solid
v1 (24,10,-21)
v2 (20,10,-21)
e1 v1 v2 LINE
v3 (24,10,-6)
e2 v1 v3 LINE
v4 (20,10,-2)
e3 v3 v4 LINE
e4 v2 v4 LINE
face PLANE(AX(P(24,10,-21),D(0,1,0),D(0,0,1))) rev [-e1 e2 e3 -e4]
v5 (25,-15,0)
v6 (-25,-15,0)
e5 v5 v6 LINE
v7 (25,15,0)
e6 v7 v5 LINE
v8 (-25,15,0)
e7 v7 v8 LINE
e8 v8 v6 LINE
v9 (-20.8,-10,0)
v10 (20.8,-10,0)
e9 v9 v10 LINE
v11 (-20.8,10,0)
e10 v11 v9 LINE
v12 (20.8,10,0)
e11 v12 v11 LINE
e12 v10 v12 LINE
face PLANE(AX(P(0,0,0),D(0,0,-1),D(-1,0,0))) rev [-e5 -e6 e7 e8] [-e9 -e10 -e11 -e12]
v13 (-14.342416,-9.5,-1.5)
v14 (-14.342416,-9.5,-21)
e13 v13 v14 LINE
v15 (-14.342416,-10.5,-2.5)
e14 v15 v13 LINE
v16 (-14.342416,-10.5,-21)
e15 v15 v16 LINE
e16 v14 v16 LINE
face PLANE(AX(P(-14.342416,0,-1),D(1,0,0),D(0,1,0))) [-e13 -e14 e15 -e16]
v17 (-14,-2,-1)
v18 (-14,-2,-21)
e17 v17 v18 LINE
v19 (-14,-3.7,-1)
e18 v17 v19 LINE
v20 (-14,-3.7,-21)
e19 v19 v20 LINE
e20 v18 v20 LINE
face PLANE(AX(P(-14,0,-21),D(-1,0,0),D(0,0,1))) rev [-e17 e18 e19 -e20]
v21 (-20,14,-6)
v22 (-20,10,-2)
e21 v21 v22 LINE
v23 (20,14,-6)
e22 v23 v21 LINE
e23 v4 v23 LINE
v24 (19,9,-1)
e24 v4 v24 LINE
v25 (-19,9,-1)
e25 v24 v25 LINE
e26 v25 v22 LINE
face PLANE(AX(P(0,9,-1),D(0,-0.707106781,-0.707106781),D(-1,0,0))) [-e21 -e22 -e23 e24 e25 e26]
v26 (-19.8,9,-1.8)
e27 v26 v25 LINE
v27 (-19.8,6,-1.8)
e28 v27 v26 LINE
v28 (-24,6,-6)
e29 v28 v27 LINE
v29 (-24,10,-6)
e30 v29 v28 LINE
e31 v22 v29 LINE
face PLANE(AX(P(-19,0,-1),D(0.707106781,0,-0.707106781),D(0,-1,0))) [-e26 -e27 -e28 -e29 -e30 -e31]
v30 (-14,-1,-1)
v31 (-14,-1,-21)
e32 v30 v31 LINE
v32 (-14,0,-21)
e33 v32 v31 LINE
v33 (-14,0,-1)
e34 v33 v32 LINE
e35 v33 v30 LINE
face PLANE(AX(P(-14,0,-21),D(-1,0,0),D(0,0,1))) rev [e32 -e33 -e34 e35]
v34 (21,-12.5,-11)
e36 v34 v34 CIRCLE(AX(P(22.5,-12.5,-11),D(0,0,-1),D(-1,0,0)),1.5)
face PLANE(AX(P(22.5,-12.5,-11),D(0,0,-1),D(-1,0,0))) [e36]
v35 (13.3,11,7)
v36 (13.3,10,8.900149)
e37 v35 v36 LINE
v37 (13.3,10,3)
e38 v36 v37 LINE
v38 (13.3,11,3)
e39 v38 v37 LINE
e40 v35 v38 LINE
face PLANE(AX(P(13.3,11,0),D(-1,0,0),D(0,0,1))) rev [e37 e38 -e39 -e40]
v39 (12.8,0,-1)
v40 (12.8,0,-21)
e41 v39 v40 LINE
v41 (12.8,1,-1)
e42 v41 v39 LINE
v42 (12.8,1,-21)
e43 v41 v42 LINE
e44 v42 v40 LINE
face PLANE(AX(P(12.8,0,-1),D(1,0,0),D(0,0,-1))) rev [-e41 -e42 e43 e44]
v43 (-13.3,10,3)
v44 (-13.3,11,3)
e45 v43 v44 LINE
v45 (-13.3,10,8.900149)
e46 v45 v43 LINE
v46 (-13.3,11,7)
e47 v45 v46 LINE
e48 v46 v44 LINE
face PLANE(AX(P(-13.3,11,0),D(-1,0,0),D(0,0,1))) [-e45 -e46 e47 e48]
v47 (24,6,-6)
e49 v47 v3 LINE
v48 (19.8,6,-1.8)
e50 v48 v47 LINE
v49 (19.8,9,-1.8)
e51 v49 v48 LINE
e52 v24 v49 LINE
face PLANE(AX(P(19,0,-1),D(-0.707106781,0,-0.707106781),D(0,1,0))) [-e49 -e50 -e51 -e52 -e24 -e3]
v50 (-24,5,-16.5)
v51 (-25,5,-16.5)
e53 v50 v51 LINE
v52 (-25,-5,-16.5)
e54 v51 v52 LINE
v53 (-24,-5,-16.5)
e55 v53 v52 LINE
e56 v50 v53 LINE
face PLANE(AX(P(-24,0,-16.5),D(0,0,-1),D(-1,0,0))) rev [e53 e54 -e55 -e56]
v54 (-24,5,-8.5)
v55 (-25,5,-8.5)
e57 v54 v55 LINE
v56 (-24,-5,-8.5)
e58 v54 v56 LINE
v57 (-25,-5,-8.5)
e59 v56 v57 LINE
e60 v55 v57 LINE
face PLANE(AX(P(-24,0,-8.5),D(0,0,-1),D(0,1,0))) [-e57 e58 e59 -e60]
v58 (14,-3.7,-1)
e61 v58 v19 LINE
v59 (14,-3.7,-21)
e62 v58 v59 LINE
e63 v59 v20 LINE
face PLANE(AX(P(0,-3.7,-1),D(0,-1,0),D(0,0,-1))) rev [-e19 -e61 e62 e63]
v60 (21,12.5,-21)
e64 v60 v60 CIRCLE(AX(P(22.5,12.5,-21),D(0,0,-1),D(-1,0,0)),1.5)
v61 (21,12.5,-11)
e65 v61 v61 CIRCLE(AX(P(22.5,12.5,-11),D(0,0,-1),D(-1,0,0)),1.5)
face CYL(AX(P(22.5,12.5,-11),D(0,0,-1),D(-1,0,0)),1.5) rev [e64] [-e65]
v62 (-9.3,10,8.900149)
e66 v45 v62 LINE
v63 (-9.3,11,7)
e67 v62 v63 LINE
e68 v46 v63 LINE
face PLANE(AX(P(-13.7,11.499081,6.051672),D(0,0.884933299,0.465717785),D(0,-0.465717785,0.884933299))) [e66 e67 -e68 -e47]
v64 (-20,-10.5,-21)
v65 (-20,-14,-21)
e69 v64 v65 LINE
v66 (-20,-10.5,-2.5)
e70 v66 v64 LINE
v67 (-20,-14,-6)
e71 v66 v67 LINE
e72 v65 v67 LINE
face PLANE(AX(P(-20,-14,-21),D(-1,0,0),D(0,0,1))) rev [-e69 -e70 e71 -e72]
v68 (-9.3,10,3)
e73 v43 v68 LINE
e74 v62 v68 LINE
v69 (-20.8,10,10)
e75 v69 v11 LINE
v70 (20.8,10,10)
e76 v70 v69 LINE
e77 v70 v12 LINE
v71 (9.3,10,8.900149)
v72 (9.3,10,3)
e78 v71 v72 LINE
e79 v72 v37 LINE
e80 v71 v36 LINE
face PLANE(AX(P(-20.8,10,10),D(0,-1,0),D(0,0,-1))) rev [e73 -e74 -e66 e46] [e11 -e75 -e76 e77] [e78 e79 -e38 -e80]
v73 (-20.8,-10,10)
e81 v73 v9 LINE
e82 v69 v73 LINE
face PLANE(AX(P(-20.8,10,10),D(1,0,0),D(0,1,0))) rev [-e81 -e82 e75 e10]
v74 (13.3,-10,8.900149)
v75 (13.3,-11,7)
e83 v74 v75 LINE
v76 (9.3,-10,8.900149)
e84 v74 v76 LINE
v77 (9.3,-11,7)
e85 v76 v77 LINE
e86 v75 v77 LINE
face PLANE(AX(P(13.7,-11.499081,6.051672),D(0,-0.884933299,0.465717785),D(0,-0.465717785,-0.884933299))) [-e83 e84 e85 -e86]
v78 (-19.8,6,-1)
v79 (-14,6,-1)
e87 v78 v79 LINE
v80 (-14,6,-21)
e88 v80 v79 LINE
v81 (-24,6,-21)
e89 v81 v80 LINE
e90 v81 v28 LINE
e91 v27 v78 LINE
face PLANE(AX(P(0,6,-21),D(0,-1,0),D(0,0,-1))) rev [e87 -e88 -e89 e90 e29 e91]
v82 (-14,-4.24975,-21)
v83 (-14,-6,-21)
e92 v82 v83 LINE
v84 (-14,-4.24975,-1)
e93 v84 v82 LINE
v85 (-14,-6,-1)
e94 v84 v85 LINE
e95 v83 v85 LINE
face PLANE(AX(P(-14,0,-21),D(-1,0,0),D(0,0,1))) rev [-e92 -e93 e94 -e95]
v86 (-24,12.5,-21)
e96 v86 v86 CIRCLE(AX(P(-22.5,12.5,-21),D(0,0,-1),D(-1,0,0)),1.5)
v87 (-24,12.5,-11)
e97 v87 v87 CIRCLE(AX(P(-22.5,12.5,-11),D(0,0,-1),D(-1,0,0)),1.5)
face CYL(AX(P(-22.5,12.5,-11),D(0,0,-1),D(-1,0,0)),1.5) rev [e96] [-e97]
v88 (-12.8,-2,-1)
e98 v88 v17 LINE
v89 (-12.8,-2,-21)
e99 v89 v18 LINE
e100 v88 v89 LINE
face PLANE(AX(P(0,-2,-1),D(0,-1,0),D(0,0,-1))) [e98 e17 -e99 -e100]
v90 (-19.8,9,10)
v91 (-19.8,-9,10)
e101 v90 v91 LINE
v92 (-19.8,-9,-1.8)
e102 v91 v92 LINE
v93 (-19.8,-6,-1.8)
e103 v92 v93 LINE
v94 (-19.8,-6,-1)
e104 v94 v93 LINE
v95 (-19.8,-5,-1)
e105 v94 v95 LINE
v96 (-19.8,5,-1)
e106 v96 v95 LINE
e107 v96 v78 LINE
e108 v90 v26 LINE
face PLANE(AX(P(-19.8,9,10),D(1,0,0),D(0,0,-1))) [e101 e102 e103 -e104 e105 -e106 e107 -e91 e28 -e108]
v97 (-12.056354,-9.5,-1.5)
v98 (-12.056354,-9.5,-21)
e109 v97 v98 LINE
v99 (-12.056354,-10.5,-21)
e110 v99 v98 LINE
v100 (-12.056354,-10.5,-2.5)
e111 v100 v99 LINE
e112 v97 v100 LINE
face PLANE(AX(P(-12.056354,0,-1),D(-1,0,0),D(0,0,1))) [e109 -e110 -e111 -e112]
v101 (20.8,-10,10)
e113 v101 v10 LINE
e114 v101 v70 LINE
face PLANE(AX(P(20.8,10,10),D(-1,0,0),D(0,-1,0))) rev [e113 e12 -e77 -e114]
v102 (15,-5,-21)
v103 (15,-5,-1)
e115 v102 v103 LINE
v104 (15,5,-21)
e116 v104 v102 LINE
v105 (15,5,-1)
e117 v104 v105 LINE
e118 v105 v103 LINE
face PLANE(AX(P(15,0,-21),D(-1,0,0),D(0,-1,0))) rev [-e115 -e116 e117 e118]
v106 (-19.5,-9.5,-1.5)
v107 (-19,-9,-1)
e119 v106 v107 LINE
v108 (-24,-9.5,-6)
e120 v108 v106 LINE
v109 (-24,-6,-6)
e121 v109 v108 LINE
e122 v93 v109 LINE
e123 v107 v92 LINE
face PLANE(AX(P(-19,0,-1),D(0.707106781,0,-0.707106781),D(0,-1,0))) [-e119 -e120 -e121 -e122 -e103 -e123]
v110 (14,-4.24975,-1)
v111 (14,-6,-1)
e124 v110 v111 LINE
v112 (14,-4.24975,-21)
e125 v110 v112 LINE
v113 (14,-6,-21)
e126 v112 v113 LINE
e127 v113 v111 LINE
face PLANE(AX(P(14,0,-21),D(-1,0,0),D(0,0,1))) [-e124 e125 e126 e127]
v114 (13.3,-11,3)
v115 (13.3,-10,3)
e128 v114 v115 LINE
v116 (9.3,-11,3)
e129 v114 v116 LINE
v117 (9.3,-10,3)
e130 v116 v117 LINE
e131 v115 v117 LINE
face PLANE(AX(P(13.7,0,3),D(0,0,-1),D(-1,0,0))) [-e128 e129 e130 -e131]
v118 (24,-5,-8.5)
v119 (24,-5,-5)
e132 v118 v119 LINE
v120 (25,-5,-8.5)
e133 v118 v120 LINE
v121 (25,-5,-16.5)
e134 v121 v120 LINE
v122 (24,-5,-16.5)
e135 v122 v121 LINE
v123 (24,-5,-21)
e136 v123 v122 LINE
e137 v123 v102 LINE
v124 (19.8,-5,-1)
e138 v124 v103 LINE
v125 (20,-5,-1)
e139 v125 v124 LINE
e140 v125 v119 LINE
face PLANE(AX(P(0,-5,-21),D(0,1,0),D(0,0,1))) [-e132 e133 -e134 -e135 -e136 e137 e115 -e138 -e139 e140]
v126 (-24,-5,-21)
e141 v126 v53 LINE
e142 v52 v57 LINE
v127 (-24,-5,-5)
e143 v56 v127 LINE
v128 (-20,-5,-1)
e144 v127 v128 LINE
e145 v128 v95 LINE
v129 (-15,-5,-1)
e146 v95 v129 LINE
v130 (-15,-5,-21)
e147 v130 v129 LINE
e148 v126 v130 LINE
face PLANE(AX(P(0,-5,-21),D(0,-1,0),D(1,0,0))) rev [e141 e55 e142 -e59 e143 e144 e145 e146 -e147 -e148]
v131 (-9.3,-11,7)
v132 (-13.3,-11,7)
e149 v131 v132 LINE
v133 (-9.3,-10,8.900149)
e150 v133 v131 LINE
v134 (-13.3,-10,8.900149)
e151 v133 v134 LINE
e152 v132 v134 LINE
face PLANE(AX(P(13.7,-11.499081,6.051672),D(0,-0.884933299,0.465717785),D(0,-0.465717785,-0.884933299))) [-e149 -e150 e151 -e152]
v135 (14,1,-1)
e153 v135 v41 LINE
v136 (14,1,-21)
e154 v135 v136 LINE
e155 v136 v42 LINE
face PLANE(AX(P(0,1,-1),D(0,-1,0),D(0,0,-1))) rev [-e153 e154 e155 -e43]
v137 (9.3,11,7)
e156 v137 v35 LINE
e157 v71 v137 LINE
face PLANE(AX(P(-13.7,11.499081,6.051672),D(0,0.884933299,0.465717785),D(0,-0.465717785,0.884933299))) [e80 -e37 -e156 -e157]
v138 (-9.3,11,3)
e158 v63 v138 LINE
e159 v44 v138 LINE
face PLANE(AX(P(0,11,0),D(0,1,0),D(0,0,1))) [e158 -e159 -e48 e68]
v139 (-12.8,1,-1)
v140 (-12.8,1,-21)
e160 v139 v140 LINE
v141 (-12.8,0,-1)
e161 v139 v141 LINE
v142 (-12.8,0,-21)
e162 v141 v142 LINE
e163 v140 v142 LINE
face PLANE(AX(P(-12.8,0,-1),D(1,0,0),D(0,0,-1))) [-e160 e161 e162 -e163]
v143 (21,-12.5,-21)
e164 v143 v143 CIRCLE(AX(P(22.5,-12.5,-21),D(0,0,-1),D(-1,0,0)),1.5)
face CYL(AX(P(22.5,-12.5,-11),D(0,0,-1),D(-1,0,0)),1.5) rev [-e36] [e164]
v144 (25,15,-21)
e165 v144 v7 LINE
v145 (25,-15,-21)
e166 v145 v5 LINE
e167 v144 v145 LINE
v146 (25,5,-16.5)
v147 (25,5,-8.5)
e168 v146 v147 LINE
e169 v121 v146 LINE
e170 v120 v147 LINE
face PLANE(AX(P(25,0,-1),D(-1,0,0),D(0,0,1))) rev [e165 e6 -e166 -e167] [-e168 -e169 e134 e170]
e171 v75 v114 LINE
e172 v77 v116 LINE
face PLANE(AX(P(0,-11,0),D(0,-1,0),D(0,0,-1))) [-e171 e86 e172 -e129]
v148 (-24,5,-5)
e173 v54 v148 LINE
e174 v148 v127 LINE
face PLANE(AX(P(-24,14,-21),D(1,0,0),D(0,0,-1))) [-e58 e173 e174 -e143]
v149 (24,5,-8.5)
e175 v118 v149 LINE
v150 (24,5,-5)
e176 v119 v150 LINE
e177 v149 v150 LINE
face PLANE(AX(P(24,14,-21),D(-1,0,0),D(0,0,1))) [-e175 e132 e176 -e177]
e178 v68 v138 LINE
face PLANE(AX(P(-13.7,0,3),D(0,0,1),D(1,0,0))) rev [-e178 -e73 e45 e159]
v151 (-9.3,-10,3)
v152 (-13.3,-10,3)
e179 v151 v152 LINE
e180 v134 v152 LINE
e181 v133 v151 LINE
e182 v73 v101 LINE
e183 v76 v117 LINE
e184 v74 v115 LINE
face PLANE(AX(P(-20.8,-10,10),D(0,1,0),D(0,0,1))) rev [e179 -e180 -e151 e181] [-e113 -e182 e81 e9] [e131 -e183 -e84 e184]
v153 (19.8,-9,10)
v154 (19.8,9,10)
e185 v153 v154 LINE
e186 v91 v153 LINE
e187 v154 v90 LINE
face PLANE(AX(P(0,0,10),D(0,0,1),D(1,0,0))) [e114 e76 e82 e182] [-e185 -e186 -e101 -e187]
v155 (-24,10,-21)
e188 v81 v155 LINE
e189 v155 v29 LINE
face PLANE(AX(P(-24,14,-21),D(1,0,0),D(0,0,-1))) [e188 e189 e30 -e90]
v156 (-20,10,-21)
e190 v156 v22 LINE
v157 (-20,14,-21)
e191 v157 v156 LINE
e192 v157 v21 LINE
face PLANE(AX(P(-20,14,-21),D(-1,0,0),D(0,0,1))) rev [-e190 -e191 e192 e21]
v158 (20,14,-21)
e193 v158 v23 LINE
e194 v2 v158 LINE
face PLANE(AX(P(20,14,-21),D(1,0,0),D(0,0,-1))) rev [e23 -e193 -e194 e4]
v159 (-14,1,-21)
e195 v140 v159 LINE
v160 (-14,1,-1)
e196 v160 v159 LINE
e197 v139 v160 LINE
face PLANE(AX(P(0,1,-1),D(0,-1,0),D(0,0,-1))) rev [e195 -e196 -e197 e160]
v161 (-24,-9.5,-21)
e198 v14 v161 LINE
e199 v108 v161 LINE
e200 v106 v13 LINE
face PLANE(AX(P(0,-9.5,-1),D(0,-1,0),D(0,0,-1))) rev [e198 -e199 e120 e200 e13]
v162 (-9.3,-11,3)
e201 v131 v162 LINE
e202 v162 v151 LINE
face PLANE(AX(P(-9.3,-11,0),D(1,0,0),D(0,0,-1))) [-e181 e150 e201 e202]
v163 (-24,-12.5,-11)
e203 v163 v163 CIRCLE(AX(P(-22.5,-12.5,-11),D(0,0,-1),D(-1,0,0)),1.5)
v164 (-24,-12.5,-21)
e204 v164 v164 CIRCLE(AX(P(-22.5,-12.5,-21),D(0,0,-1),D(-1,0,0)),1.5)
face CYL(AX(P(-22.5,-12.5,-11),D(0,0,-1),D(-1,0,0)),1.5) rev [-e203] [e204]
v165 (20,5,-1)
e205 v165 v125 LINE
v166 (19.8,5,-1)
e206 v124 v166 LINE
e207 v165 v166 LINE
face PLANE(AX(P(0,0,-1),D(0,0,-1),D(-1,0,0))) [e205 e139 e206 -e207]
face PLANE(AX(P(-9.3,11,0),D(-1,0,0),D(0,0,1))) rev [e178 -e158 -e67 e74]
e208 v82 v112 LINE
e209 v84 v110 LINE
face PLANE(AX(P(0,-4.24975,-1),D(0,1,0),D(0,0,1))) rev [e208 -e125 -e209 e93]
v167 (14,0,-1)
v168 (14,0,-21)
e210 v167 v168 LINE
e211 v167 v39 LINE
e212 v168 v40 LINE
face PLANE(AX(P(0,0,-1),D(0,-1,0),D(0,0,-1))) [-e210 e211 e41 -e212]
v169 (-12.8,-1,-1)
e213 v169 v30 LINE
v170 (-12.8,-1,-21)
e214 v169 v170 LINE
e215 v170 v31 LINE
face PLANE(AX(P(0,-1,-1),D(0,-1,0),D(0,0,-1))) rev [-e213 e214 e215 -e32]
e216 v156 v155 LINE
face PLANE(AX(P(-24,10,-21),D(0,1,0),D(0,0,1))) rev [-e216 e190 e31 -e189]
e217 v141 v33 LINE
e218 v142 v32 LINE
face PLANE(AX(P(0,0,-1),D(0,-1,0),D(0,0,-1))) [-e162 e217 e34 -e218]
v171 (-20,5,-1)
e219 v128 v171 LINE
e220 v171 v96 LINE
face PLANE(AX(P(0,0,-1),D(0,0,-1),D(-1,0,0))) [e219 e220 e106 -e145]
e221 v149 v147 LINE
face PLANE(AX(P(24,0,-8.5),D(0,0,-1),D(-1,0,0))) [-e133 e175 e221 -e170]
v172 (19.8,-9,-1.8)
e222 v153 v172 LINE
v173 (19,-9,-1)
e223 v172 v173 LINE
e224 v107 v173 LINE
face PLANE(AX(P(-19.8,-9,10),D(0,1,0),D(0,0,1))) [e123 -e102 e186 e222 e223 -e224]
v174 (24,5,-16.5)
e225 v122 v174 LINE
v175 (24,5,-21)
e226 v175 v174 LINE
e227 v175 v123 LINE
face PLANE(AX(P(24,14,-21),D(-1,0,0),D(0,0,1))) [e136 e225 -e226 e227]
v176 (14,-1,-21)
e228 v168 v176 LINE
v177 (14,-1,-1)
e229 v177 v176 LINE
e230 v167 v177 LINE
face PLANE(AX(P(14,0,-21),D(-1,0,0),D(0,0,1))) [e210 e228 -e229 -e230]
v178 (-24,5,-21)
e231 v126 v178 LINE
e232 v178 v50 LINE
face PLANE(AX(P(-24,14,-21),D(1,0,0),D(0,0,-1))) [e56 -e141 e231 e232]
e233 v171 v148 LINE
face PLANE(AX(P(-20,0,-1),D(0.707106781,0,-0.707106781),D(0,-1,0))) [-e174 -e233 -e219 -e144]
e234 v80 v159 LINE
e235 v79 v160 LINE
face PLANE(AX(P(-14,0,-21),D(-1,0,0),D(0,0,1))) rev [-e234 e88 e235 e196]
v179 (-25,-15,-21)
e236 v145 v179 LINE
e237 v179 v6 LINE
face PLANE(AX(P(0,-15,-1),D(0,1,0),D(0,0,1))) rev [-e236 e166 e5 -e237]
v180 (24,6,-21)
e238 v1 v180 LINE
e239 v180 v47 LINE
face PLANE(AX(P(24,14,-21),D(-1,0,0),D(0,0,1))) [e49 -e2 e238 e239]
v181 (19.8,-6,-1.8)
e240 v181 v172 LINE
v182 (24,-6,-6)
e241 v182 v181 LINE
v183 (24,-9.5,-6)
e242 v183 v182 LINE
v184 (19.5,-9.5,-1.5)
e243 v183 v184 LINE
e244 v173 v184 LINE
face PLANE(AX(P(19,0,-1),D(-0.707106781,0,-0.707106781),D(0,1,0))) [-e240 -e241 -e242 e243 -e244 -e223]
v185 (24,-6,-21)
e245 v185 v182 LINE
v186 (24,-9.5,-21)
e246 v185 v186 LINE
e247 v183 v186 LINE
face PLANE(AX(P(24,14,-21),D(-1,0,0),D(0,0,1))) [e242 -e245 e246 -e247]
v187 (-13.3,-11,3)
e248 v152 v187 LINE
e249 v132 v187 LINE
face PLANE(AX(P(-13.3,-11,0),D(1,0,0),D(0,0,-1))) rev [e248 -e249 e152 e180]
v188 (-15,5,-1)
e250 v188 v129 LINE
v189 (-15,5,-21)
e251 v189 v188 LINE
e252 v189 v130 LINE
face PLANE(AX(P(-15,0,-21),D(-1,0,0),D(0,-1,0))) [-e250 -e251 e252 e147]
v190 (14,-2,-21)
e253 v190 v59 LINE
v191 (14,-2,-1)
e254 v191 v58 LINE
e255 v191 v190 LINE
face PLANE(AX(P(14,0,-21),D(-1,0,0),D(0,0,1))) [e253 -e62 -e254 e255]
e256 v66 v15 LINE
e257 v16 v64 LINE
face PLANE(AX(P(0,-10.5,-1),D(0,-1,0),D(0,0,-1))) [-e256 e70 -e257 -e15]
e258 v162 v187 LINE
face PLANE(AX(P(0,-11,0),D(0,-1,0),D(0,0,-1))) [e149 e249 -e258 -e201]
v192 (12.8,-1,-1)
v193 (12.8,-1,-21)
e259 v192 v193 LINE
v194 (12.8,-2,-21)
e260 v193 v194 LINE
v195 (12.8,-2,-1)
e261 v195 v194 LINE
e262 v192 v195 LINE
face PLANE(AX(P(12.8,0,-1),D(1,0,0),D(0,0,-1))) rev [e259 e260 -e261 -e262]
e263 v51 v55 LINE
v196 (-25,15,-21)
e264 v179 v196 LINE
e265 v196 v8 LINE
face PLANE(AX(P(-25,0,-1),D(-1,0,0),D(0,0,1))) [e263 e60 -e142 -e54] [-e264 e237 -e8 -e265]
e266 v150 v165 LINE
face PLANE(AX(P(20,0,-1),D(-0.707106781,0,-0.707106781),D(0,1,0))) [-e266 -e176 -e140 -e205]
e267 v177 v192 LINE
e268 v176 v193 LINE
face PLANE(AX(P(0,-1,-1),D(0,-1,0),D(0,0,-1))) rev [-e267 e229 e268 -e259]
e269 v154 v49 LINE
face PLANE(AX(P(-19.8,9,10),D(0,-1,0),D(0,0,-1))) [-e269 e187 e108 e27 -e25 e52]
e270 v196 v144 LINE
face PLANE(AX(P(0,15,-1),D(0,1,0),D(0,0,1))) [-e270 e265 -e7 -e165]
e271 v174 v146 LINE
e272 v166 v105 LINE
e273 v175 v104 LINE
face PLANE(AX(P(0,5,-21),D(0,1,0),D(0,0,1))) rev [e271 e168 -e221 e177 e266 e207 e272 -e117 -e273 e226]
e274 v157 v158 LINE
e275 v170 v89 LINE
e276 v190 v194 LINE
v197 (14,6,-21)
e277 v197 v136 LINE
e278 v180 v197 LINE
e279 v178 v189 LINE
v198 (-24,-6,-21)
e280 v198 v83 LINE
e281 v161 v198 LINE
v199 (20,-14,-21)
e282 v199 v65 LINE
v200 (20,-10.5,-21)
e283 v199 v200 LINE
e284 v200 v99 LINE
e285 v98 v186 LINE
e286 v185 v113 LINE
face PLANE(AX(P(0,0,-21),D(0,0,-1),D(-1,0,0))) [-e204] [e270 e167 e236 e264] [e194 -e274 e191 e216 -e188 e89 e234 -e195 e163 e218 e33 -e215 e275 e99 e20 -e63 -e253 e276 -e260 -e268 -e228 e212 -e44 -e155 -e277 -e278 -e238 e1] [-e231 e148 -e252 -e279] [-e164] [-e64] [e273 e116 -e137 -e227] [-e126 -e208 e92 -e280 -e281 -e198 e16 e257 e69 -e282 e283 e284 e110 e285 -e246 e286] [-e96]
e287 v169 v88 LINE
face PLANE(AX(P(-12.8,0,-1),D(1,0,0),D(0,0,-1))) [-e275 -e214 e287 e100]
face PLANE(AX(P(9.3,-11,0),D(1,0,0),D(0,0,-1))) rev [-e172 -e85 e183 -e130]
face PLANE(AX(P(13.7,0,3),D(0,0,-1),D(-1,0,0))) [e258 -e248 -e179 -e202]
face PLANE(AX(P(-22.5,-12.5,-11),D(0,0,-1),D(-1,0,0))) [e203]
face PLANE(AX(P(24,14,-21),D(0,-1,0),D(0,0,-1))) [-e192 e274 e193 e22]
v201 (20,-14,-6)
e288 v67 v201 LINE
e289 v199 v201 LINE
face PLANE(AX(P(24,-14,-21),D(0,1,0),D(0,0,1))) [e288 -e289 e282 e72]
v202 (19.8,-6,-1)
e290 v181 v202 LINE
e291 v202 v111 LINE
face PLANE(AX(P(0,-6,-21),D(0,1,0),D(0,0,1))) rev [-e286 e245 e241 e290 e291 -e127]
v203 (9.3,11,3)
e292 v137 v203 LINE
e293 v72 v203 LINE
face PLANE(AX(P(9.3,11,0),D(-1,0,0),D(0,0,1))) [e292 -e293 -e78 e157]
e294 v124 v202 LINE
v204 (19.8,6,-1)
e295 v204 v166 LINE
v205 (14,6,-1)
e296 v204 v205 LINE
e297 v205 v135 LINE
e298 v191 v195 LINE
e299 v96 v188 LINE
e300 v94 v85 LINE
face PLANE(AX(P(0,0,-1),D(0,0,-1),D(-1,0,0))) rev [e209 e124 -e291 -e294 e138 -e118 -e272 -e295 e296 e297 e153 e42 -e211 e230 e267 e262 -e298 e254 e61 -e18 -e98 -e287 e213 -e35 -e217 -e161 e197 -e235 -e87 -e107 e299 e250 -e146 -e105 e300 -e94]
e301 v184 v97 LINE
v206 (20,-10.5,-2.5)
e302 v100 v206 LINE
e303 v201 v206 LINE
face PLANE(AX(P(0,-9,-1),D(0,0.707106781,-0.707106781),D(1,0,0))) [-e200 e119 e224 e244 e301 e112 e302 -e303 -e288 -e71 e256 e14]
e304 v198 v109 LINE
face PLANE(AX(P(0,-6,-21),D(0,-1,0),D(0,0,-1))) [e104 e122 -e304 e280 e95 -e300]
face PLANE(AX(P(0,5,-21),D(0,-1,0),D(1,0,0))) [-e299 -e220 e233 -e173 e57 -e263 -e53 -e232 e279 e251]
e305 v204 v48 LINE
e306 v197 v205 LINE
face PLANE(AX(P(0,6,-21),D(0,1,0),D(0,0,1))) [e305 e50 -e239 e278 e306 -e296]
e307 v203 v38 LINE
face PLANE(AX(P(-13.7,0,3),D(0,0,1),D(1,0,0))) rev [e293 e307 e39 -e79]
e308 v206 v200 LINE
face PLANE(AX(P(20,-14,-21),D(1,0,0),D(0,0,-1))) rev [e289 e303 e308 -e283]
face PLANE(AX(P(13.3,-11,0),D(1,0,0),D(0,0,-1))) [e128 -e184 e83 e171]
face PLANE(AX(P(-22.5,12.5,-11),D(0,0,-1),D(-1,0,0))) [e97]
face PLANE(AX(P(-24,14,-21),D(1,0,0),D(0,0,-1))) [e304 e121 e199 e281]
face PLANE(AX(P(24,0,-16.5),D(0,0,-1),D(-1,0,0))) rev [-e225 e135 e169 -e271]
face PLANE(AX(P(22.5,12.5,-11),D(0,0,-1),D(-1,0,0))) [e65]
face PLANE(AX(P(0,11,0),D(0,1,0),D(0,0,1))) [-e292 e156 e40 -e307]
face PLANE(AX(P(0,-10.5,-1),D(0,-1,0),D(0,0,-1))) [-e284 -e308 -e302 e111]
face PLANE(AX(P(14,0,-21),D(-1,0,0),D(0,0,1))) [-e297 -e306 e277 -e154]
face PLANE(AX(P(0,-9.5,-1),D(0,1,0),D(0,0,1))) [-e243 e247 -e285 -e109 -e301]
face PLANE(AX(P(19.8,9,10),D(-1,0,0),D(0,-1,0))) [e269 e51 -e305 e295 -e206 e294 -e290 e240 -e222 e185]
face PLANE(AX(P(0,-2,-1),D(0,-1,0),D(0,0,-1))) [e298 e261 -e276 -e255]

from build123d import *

# Parameters (mm, degrees)
SKETCH1_W            = 41.6
SKETCH1_H            = 20
SKETCH1_W_2          = 39.6
SKETCH1_H_2          = 18
BOSS_EXTRUDE2_DEPTH  = 10
SKETCH2_W            = 4
SKETCH2_H            = 10
BOSS_EXTRUDE3_DEPTH  = 1
SKETCH3_W            = 3
SKETCH3_H            = 1
CUT_EXTRUDE1_DEPTH   = 27
SKETCH4_W            = 4
SKETCH4_H            = 10
BOSS_EXTRUDE4_DEPTH  = 1
SKETCH5_W            = 3
SKETCH5_H            = 1
CUT_EXTRUDE2_DEPTH   = 27
SKETCH6_W            = 50
SKETCH6_H            = 30
SKETCH6_W_2          = 41.6
SKETCH6_H_2          = 20
SKETCH6_W_3          = 39.6
SKETCH6_H_3          = 18
BOSS_EXTRUDE6_DEPTH  = 1
SKETCH7_W            = 50
SKETCH7_H            = 30
SKETCH7_W_2          = 48
SKETCH7_H_2          = 28
BOSS_EXTRUDE7_DEPTH  = 20
SKETCH8_W            = 4.2
SKETCH8_H            = 1
BOSS_EXTRUDE8_DEPTH  = 20
SKETCH9_W            = 4.2
SKETCH9_H            = 1
BOSS_EXTRUDE9_DEPTH  = 20
SKETCH10_W           = 4
SKETCH10_H           = 4
BOSS_EXTRUDE10_DEPTH = 20
SKETCH11_W           = 2
SKETCH11_H           = 10
CUT_EXTRUDE3_DEPTH   = 1
SKETCH12_W           = 2
SKETCH12_H           = 10
CUT_EXTRUDE4_DEPTH   = 1
SKETCH13_R           = 1.5
CUT_EXTRUDE5_DEPTH   = 10
CHAMFER2_SIZE        = 5
CHAMFER3_SIZE        = 5
CHAMFER4_SIZE        = 4
SKETCH16_W           = 1.2
SKETCH16_H           = 1
BOSS_EXTRUDE11_DEPTH = 20
BOSS_EXTRUDE12_DEPTH = 20
SKETCH18_W           = 28
SKETCH18_H           = 0.549749779
BOSS_EXTRUDE13_DEPTH = 20


# Some blends are built 0.0001 mm under size
with BuildPart() as part:
    # Sketch1 → Boss-Extrude2 (new body)
    with BuildSketch(Plane.XY):
        Rectangle(SKETCH1_W, SKETCH1_H)
        Rectangle(SKETCH1_W_2, SKETCH1_H_2, mode=Mode.SUBTRACT)
    extrude(amount=BOSS_EXTRUDE2_DEPTH)

    # Sketch2 → Boss-Extrude3 (add)
    with BuildSketch(Plane.XZ.offset(10)):
        with Locations((-11.3, 5)):
            Rectangle(SKETCH2_W, SKETCH2_H)
        with Locations((11.3, 5)):
            Rectangle(SKETCH2_W, SKETCH2_H)
    extrude(amount=BOSS_EXTRUDE3_DEPTH)

    # Sketch3 → Cut-Extrude1 (cut)
    with BuildSketch(Plane.ZY.offset(13.3)):
        Polygon((8.900149248, -10), (7, -11), (10, -11), (10, -10), align=None)
        with Locations((1.5, -10.5)):
            Rectangle(SKETCH3_W, SKETCH3_H)
    extrude(amount=-CUT_EXTRUDE1_DEPTH, mode=Mode.SUBTRACT)

    # Sketch4 → Boss-Extrude4 (add)
    with BuildSketch(Plane(origin=(0, 10, 0), x_dir=(1, 0, 0), z_dir=(0, 1, 0))):
        with Locations((11.3, -5)):
            Rectangle(SKETCH4_W, SKETCH4_H)
        with Locations((-11.3, -5)):
            Rectangle(SKETCH4_W, SKETCH4_H)
    extrude(amount=BOSS_EXTRUDE4_DEPTH)

    # Sketch5 → Cut-Extrude2 (cut)
    with BuildSketch(Plane(origin=(13.3, 0, 0), x_dir=(0, 0, -1), z_dir=(1, 0, 0))):
        Polygon((-7, 11), (-10, 11), (-10, 10), (-8.900149248, 10), align=None)
        with Locations((-1.5, 10.5)):
            Rectangle(SKETCH5_W, SKETCH5_H)
    extrude(amount=-CUT_EXTRUDE2_DEPTH, mode=Mode.SUBTRACT)

    # Sketch6 → Boss-Extrude6 (add)
    # profile 1 of 2: a face of its own
    with BuildSketch(Plane(origin=(0, 0, 0), x_dir=(-1, 0, 0), z_dir=(0, 0, -1))):
        Rectangle(SKETCH6_W, SKETCH6_H)
        Rectangle(SKETCH6_W_2, SKETCH6_H_2, mode=Mode.SUBTRACT)
    # profile 2 of 2: a face of its own
    with BuildSketch(Plane(origin=(0, 0, 0), x_dir=(-1, 0, 0), z_dir=(0, 0, -1))):
        Rectangle(SKETCH6_W_2, SKETCH6_H_2)
        Rectangle(SKETCH6_W_3, SKETCH6_H_3, mode=Mode.SUBTRACT)
    extrude(amount=BOSS_EXTRUDE6_DEPTH)

    # Sketch7 → Boss-Extrude7 (add)
    with BuildSketch(Plane(origin=(0, 0, -1), x_dir=(-1, 0, 0), z_dir=(0, 0, -1))):
        Rectangle(SKETCH7_W, SKETCH7_H)
        Rectangle(SKETCH7_W_2, SKETCH7_H_2, mode=Mode.SUBTRACT)
    extrude(amount=BOSS_EXTRUDE7_DEPTH)

    # Sketch8 → Boss-Extrude8 (add)
    with BuildSketch(Plane(origin=(0, 0, -1), x_dir=(-1, 0, 0), z_dir=(0, 0, -1))):
        Polygon((-15, -5), (-19.8, -5), (-19.8, -6), (-14, -6), (-14, 6), (-19.8, 6), (-19.8, 5), (-15, 5), align=None)
        with Locations((-21.9, 5.5)):
            Rectangle(SKETCH8_W, SKETCH8_H)
        with Locations((-21.9, -5.5)):
            Rectangle(SKETCH8_W, SKETCH8_H)
    extrude(amount=BOSS_EXTRUDE8_DEPTH)

    # Sketch9 → Boss-Extrude9 (add)
    with BuildSketch(Plane(origin=(0, 0, -1), x_dir=(-1, 0, 0), z_dir=(0, 0, -1))):
        Polygon((15, 5), (19.8, 5), (19.8, 6), (14, 6), (14, -6), (19.8, -6), (19.8, -5), (15, -5), align=None)
        with Locations((21.9, 5.5)):
            Rectangle(SKETCH9_W, SKETCH9_H)
        with Locations((21.9, -5.5)):
            Rectangle(SKETCH9_W, SKETCH9_H)
    extrude(amount=BOSS_EXTRUDE9_DEPTH)

    # Sketch10 → Boss-Extrude10 (add)
    with BuildSketch(Plane(origin=(0, 0, -1), x_dir=(-1, 0, 0), z_dir=(0, 0, -1))):
        with Locations((-22, 12)):
            Rectangle(SKETCH10_W, SKETCH10_H)
        with Locations((22, 12)):
            Rectangle(SKETCH10_W, SKETCH10_H)
        with Locations((22, -12)):
            Rectangle(SKETCH10_W, SKETCH10_H)
        with Locations((-22, -12)):
            Rectangle(SKETCH10_W, SKETCH10_H)
    extrude(amount=BOSS_EXTRUDE10_DEPTH)

    # Sketch11 → Cut-Extrude3 (cut)
    with BuildSketch(Plane.ZY.offset(25)):
        Polygon((-10.5, -5), (-10.5, 5), (-16.5, 5), (-16.5, 0), (-16.5, -5), align=None)
        with Locations((-9.5, 0)):
            Rectangle(SKETCH11_W, SKETCH11_H)
    extrude(amount=-CUT_EXTRUDE3_DEPTH, mode=Mode.SUBTRACT)

    # Sketch12 → Cut-Extrude4 (cut)
    with BuildSketch(Plane(origin=(25, 0, 0), x_dir=(0, 0, -1), z_dir=(1, 0, 0))):
        with Locations((9.5, 0)):
            Rectangle(SKETCH12_W, SKETCH12_H)
        Polygon((16.5, 5), (10.5, 5), (10.5, -5), (16.5, -5), (16.5, 0), align=None)
    extrude(amount=-CUT_EXTRUDE4_DEPTH, mode=Mode.SUBTRACT)

    # Sketch13 → Cut-Extrude5 (cut)
    with BuildSketch(Plane(origin=(0, 0, -21), x_dir=(-1, 0, 0), z_dir=(0, 0, -1))):
        with Locations((-22.5, 12.5)):
            Circle(SKETCH13_R)
        with Locations((22.5, 12.5)):
            Circle(SKETCH13_R)
        with Locations((22.5, -12.5)):
            Circle(SKETCH13_R)
        with Locations((-22.5, -12.5)):
            Circle(SKETCH13_R)
    extrude(amount=-CUT_EXTRUDE5_DEPTH, mode=Mode.SUBTRACT)

    # Chamfer2
    chamfer2_edges = [part.edges().sort_by_distance(p)[0] for p in [
        (0, 14, -1),
        (0, -14, -1),
    ]]
    chamfer(chamfer2_edges, length=CHAMFER2_SIZE - 0.0001)  # a hair under: the kernel refuses the full size

    # Chamfer3
    # the kernel refuses this chamfer: 5 mm, written as the material it adds along each edge
    with BuildSketch(Plane(origin=(24, -21.85851494, -1), x_dir=(-0.9996219169112968, 0, 0.02749587661058636), z_dir=(0, 1, 0))) as chamfer3_piece_1_section:
        Polygon((CHAMFER3_SIZE * 0.999621916911, -CHAMFER3_SIZE * 0.0274958766106), (-CHAMFER3_SIZE * 0.0274958766106, -CHAMFER3_SIZE * 0.999621916911), (0, 0), align=None)
    chamfer3_piece_1 = extrude(amount=28.71692988, mode=Mode.PRIVATE)
    chamfer3_piece_1 = split(chamfer3_piece_1, bisect_by=Plane(origin=(19.8, -10.000025, -1.99995), z_dir=(1, 0, 0)), keep=Keep.TOP, mode=Mode.PRIVATE)
    chamfer3_piece_1 = split(chamfer3_piece_1, bisect_by=Plane(origin=(19.999975, -5, -1.99995), z_dir=(0, -1, 0)), keep=Keep.TOP, mode=Mode.PRIVATE)
    chamfer3_piece_1 = split(chamfer3_piece_1, bisect_by=Plane(origin=(19.999975, -10.0000375, -1.9999375), z_dir=(0, 0.7071067811865476, -0.7071067811865476)), keep=Keep.TOP, mode=Mode.PRIVATE)
    add(chamfer3_piece_1)
    with BuildSketch(Plane(origin=(24, -21.85851494, -1), x_dir=(-0.9996219169112968, 0, 0.02749587661058636), z_dir=(0, 1, 0))) as chamfer3_piece_2_section:
        Polygon((CHAMFER3_SIZE * 0.999621916911, -CHAMFER3_SIZE * 0.0274958766106), (-CHAMFER3_SIZE * 0.0274958766106, -CHAMFER3_SIZE * 0.999621916911), (0, 0), align=None)
    chamfer3_piece_2 = extrude(amount=28.71692988, mode=Mode.PRIVATE)
    chamfer3_piece_2 = split(chamfer3_piece_2, bisect_by=Plane(origin=(19.599975009, -9, -1.399950019), z_dir=(0, -1, 0)), keep=Keep.TOP, mode=Mode.PRIVATE)
    chamfer3_piece_2 = split(chamfer3_piece_2, bisect_by=Plane(origin=(19.599975009, -9.300037514, -1.299937514), z_dir=(0, 0.7071067811865476, -0.7071067811865476)), keep=Keep.TOP, mode=Mode.PRIVATE)
    add(chamfer3_piece_2)
    with BuildSketch(Plane(origin=(24, -21.85851494, -1), x_dir=(-0.9996219169112968, 0, 0.02749587661058636), z_dir=(0, 1, 0))) as chamfer3_piece_3_section:
        Polygon((CHAMFER3_SIZE * 0.999621916911, -CHAMFER3_SIZE * 0.0274958766106), (-CHAMFER3_SIZE * 0.0274958766106, -CHAMFER3_SIZE * 0.999621916911), (0, 0), align=None)
    chamfer3_piece_3 = extrude(amount=28.71692988, mode=Mode.PRIVATE)
    chamfer3_piece_3 = split(chamfer3_piece_3, bisect_by=Plane(origin=(19.8, 6.42920747, -1.451851852), z_dir=(1, 0, 0)), keep=Keep.TOP, mode=Mode.PRIVATE)
    chamfer3_piece_3 = split(chamfer3_piece_3, bisect_by=Plane(origin=(19.903703704, 5, -1.451851852), z_dir=(0, 1, 0)), keep=Keep.TOP, mode=Mode.PRIVATE)
    add(chamfer3_piece_3)
    with BuildSketch(Plane(origin=(-24, 21.85851494, -1), x_dir=(0.9996219169112968, 0, 0.02749587661058636), z_dir=(0, -1, 0))) as chamfer3_piece_4_section:
        Polygon((CHAMFER3_SIZE * 0.999621916911, -CHAMFER3_SIZE * 0.0274958766106), (-CHAMFER3_SIZE * 0.0274958766106, -CHAMFER3_SIZE * 0.999621916911), (0, 0), align=None)
    chamfer3_piece_4 = extrude(amount=28.71692988, mode=Mode.PRIVATE)
    chamfer3_piece_4 = split(chamfer3_piece_4, bisect_by=Plane(origin=(-19.8, 10.000025, -1.99995), z_dir=(-1, 0, 0)), keep=Keep.TOP, mode=Mode.PRIVATE)
    chamfer3_piece_4 = split(chamfer3_piece_4, bisect_by=Plane(origin=(-19.999975, 15, -1.99995), z_dir=(0, -1, 0)), keep=Keep.TOP, mode=Mode.PRIVATE)
    chamfer3_piece_4 = split(chamfer3_piece_4, bisect_by=Plane(origin=(-19.999975, 5, -1.99995), z_dir=(0, 1, 0)), keep=Keep.TOP, mode=Mode.PRIVATE)
    add(chamfer3_piece_4)
    with BuildSketch(Plane(origin=(-24, 21.85851494, -1), x_dir=(0.9996219169112968, 0, 0.02749587661058636), z_dir=(0, -1, 0))) as chamfer3_piece_5_section:
        Polygon((CHAMFER3_SIZE * 0.999621916911, -CHAMFER3_SIZE * 0.0274958766106), (-CHAMFER3_SIZE * 0.0274958766106, -CHAMFER3_SIZE * 0.999621916911), (0, 0), align=None)
    chamfer3_piece_5 = extrude(amount=28.71692988, mode=Mode.PRIVATE)
    chamfer3_piece_5 = split(chamfer3_piece_5, bisect_by=Plane(origin=(-19.599975009, 9, -1.399950019), z_dir=(0, 1, 0)), keep=Keep.TOP, mode=Mode.PRIVATE)
    chamfer3_piece_5 = split(chamfer3_piece_5, bisect_by=Plane(origin=(-19.599975009, 15, -1.399950019), z_dir=(0, -1, 0)), keep=Keep.TOP, mode=Mode.PRIVATE)
    add(chamfer3_piece_5)
    with BuildSketch(Plane(origin=(-24, 21.85851494, -1), x_dir=(0.9996219169112968, 0, 0.02749587661058636), z_dir=(0, -1, 0))) as chamfer3_piece_6_section:
        Polygon((CHAMFER3_SIZE * 0.999621916911, -CHAMFER3_SIZE * 0.0274958766106), (-CHAMFER3_SIZE * 0.0274958766106, -CHAMFER3_SIZE * 0.999621916911), (0, 0), align=None)
    chamfer3_piece_6 = extrude(amount=28.71692988, mode=Mode.PRIVATE)
    chamfer3_piece_6 = split(chamfer3_piece_6, bisect_by=Plane(origin=(-19.8, -6.42920747, -1.451851852), z_dir=(-1, 0, 0)), keep=Keep.TOP, mode=Mode.PRIVATE)
    chamfer3_piece_6 = split(chamfer3_piece_6, bisect_by=Plane(origin=(-19.903703704, -6, -1.451851852), z_dir=(0, -1, 0)), keep=Keep.TOP, mode=Mode.PRIVATE)
    add(chamfer3_piece_6)
    with BuildSketch(Plane(origin=(-24, 6.85841494, -1), x_dir=(0.9996219169112968, 0, 0.02749587661058636), z_dir=(0, -1, 0))) as chamfer3_piece_7_section:
        Polygon((CHAMFER3_SIZE * 0.999621916911, -CHAMFER3_SIZE * 0.0274958766106), (-CHAMFER3_SIZE * 0.0274958766106, -CHAMFER3_SIZE * 0.999621916911), (0, 0), align=None)
    chamfer3_piece_7 = extrude(amount=28.71692988, mode=Mode.PRIVATE)
    chamfer3_piece_7 = split(chamfer3_piece_7, bisect_by=Plane(origin=(-19.8, 6.42920747, -1.451851852), z_dir=(-1, 0, 0)), keep=Keep.TOP, mode=Mode.PRIVATE)
    chamfer3_piece_7 = split(chamfer3_piece_7, bisect_by=Plane(origin=(-19.903703704, 5, -1.451851852), z_dir=(0, 1, 0)), keep=Keep.TOP, mode=Mode.PRIVATE)
    add(chamfer3_piece_7)
    with BuildSketch(Plane(origin=(-24, -6, -1), x_dir=(0.9996219169112968, 0, 0.02749587661058636), z_dir=(0, -1, 0))) as chamfer3_piece_8_section:
        Polygon((CHAMFER3_SIZE * 0.999621916911, -CHAMFER3_SIZE * 0.0274958766106), (-CHAMFER3_SIZE * 0.0274958766106, -CHAMFER3_SIZE * 0.999621916911), (0, 0), align=None)
    chamfer3_piece_8 = extrude(amount=15.85851494, mode=Mode.PRIVATE)
    chamfer3_piece_8 = split(chamfer3_piece_8, bisect_by=Plane(origin=(-19.8, -7.5, -1.451851852), z_dir=(-1, 0, 0)), keep=Keep.TOP, mode=Mode.PRIVATE)
    chamfer3_piece_8 = split(chamfer3_piece_8, bisect_by=Plane(origin=(-19.903703704, -8.475975926, -0.475875926), z_dir=(0, 0.7071067811865476, -0.7071067811865476)), keep=Keep.TOP, mode=Mode.PRIVATE)
    add(chamfer3_piece_8)
    with BuildSketch(Plane(origin=(-24, 6.85841494, -1), x_dir=(0.9996219169112968, 0, 0.02749587661058636), z_dir=(0, -1, 0))) as chamfer3_piece_9_section:
        Polygon((CHAMFER3_SIZE * 0.999621916911, -CHAMFER3_SIZE * 0.0274958766106), (-CHAMFER3_SIZE * 0.0274958766106, -CHAMFER3_SIZE * 0.999621916911), (0, 0), align=None)
    chamfer3_piece_9 = extrude(amount=28.71692988, mode=Mode.PRIVATE)
    chamfer3_piece_9 = split(chamfer3_piece_9, bisect_by=Plane(origin=(-19.599975009, -9, -1.399950019), z_dir=(0, -1, 0)), keep=Keep.TOP, mode=Mode.PRIVATE)
    chamfer3_piece_9 = split(chamfer3_piece_9, bisect_by=Plane(origin=(-19.599975009, -9.300037514, -1.299937514), z_dir=(0, 0.7071067811865476, -0.7071067811865476)), keep=Keep.TOP, mode=Mode.PRIVATE)
    add(chamfer3_piece_9)
    with BuildSketch(Plane(origin=(24, -6.85841494, -1), x_dir=(-0.9996219169112968, 0, 0.02749587661058636), z_dir=(0, 1, 0))) as chamfer3_piece_10_section:
        Polygon((CHAMFER3_SIZE * 0.999621916911, -CHAMFER3_SIZE * 0.0274958766106), (-CHAMFER3_SIZE * 0.0274958766106, -CHAMFER3_SIZE * 0.999621916911), (0, 0), align=None)
    chamfer3_piece_10 = extrude(amount=28.71692988, mode=Mode.PRIVATE)
    chamfer3_piece_10 = split(chamfer3_piece_10, bisect_by=Plane(origin=(19.8, -6.42920747, -1.451851852), z_dir=(1, 0, 0)), keep=Keep.TOP, mode=Mode.PRIVATE)
    chamfer3_piece_10 = split(chamfer3_piece_10, bisect_by=Plane(origin=(19.903703704, -5, -1.451851852), z_dir=(0, -1, 0)), keep=Keep.TOP, mode=Mode.PRIVATE)
    add(chamfer3_piece_10)
    with BuildSketch(Plane(origin=(24, -6.85841494, -1), x_dir=(-0.9996219169112968, 0, 0.02749587661058636), z_dir=(0, 1, 0))) as chamfer3_piece_11_section:
        Polygon((CHAMFER3_SIZE * 0.999621916911, -CHAMFER3_SIZE * 0.0274958766106), (-CHAMFER3_SIZE * 0.0274958766106, -CHAMFER3_SIZE * 0.999621916911), (0, 0), align=None)
    chamfer3_piece_11 = extrude(amount=28.71692988, mode=Mode.PRIVATE)
    chamfer3_piece_11 = split(chamfer3_piece_11, bisect_by=Plane(origin=(19.8, 7.5, -1.451851852), z_dir=(1, 0, 0)), keep=Keep.TOP, mode=Mode.PRIVATE)
    chamfer3_piece_11 = split(chamfer3_piece_11, bisect_by=Plane(origin=(19.903703704, 15, -1.451851852), z_dir=(0, -1, 0)), keep=Keep.TOP, mode=Mode.PRIVATE)
    chamfer3_piece_11 = split(chamfer3_piece_11, bisect_by=Plane(origin=(19.903703704, 5, -1.451851852), z_dir=(0, 1, 0)), keep=Keep.TOP, mode=Mode.PRIVATE)
    add(chamfer3_piece_11)
    with BuildSketch(Plane(origin=(24, -6.85841494, -1), x_dir=(-0.9996219169112968, 0, 0.02749587661058636), z_dir=(0, 1, 0))) as chamfer3_piece_12_section:
        Polygon((CHAMFER3_SIZE * 0.999621916911, -CHAMFER3_SIZE * 0.0274958766106), (-CHAMFER3_SIZE * 0.0274958766106, -CHAMFER3_SIZE * 0.999621916911), (0, 0), align=None)
    chamfer3_piece_12 = extrude(amount=28.71692988, mode=Mode.PRIVATE)
    chamfer3_piece_12 = split(chamfer3_piece_12, bisect_by=Plane(origin=(19.599975009, 9, -1.399950019), z_dir=(0, 1, 0)), keep=Keep.TOP, mode=Mode.PRIVATE)
    chamfer3_piece_12 = split(chamfer3_piece_12, bisect_by=Plane(origin=(19.599975009, 15, -1.399950019), z_dir=(0, -1, 0)), keep=Keep.TOP, mode=Mode.PRIVATE)
    add(chamfer3_piece_12)

    # Chamfer4
    chamfer4_edges = [part.edges().sort_by_distance(p)[0] for p in [
        (24, 0, -1),
        (-24, 0, -1),
    ]]
    chamfer(chamfer4_edges, length=CHAMFER4_SIZE)

    # Sketch16 → Boss-Extrude11 (add)
    with BuildSketch(Plane(origin=(0, 0, -21), x_dir=(-1, 0, 0), z_dir=(0, 0, -1))):
        with Locations((-13.4, 0.5)):
            Rectangle(SKETCH16_W, SKETCH16_H)
        with Locations((-13.4, -1.5)):
            Rectangle(SKETCH16_W, SKETCH16_H)
        with Locations((13.4, 0.5)):
            Rectangle(SKETCH16_W, SKETCH16_H)
        Polygon((13, -1), (12.8, -1), (12.8, -2), (14, -2), (14, -1), align=None)
    extrude(amount=-BOSS_EXTRUDE11_DEPTH)

    # Sketch17 → Boss-Extrude12 (add)
    with BuildSketch(Plane(origin=(0, 0, -21), x_dir=(-1, 0, 0), z_dir=(0, 0, -1))):
        Polygon((-20, -10), (-20, -10.5), (-16.744161901, -10.5), (12.056353702, -10.5), (12.056353702, -9.5), (-24, -9.5), (-24, -10), align=None)
        Polygon((14.342415664, -9.5), (14.342415664, -10.5), (20, -10.5), (20, -10), (24, -10), (24, -9.5), align=None)
    extrude(amount=-BOSS_EXTRUDE12_DEPTH)

    # Sketch18 → Boss-Extrude13 (add)
    with BuildSketch(Plane(origin=(0, 0, -21), x_dir=(-1, 0, 0), z_dir=(0, 0, -1))):
        with Locations((0, -3.97487489)):
            Rectangle(SKETCH18_W, SKETCH18_H)
    extrude(amount=-BOSS_EXTRUDE13_DEPTH)


solid = part.part
